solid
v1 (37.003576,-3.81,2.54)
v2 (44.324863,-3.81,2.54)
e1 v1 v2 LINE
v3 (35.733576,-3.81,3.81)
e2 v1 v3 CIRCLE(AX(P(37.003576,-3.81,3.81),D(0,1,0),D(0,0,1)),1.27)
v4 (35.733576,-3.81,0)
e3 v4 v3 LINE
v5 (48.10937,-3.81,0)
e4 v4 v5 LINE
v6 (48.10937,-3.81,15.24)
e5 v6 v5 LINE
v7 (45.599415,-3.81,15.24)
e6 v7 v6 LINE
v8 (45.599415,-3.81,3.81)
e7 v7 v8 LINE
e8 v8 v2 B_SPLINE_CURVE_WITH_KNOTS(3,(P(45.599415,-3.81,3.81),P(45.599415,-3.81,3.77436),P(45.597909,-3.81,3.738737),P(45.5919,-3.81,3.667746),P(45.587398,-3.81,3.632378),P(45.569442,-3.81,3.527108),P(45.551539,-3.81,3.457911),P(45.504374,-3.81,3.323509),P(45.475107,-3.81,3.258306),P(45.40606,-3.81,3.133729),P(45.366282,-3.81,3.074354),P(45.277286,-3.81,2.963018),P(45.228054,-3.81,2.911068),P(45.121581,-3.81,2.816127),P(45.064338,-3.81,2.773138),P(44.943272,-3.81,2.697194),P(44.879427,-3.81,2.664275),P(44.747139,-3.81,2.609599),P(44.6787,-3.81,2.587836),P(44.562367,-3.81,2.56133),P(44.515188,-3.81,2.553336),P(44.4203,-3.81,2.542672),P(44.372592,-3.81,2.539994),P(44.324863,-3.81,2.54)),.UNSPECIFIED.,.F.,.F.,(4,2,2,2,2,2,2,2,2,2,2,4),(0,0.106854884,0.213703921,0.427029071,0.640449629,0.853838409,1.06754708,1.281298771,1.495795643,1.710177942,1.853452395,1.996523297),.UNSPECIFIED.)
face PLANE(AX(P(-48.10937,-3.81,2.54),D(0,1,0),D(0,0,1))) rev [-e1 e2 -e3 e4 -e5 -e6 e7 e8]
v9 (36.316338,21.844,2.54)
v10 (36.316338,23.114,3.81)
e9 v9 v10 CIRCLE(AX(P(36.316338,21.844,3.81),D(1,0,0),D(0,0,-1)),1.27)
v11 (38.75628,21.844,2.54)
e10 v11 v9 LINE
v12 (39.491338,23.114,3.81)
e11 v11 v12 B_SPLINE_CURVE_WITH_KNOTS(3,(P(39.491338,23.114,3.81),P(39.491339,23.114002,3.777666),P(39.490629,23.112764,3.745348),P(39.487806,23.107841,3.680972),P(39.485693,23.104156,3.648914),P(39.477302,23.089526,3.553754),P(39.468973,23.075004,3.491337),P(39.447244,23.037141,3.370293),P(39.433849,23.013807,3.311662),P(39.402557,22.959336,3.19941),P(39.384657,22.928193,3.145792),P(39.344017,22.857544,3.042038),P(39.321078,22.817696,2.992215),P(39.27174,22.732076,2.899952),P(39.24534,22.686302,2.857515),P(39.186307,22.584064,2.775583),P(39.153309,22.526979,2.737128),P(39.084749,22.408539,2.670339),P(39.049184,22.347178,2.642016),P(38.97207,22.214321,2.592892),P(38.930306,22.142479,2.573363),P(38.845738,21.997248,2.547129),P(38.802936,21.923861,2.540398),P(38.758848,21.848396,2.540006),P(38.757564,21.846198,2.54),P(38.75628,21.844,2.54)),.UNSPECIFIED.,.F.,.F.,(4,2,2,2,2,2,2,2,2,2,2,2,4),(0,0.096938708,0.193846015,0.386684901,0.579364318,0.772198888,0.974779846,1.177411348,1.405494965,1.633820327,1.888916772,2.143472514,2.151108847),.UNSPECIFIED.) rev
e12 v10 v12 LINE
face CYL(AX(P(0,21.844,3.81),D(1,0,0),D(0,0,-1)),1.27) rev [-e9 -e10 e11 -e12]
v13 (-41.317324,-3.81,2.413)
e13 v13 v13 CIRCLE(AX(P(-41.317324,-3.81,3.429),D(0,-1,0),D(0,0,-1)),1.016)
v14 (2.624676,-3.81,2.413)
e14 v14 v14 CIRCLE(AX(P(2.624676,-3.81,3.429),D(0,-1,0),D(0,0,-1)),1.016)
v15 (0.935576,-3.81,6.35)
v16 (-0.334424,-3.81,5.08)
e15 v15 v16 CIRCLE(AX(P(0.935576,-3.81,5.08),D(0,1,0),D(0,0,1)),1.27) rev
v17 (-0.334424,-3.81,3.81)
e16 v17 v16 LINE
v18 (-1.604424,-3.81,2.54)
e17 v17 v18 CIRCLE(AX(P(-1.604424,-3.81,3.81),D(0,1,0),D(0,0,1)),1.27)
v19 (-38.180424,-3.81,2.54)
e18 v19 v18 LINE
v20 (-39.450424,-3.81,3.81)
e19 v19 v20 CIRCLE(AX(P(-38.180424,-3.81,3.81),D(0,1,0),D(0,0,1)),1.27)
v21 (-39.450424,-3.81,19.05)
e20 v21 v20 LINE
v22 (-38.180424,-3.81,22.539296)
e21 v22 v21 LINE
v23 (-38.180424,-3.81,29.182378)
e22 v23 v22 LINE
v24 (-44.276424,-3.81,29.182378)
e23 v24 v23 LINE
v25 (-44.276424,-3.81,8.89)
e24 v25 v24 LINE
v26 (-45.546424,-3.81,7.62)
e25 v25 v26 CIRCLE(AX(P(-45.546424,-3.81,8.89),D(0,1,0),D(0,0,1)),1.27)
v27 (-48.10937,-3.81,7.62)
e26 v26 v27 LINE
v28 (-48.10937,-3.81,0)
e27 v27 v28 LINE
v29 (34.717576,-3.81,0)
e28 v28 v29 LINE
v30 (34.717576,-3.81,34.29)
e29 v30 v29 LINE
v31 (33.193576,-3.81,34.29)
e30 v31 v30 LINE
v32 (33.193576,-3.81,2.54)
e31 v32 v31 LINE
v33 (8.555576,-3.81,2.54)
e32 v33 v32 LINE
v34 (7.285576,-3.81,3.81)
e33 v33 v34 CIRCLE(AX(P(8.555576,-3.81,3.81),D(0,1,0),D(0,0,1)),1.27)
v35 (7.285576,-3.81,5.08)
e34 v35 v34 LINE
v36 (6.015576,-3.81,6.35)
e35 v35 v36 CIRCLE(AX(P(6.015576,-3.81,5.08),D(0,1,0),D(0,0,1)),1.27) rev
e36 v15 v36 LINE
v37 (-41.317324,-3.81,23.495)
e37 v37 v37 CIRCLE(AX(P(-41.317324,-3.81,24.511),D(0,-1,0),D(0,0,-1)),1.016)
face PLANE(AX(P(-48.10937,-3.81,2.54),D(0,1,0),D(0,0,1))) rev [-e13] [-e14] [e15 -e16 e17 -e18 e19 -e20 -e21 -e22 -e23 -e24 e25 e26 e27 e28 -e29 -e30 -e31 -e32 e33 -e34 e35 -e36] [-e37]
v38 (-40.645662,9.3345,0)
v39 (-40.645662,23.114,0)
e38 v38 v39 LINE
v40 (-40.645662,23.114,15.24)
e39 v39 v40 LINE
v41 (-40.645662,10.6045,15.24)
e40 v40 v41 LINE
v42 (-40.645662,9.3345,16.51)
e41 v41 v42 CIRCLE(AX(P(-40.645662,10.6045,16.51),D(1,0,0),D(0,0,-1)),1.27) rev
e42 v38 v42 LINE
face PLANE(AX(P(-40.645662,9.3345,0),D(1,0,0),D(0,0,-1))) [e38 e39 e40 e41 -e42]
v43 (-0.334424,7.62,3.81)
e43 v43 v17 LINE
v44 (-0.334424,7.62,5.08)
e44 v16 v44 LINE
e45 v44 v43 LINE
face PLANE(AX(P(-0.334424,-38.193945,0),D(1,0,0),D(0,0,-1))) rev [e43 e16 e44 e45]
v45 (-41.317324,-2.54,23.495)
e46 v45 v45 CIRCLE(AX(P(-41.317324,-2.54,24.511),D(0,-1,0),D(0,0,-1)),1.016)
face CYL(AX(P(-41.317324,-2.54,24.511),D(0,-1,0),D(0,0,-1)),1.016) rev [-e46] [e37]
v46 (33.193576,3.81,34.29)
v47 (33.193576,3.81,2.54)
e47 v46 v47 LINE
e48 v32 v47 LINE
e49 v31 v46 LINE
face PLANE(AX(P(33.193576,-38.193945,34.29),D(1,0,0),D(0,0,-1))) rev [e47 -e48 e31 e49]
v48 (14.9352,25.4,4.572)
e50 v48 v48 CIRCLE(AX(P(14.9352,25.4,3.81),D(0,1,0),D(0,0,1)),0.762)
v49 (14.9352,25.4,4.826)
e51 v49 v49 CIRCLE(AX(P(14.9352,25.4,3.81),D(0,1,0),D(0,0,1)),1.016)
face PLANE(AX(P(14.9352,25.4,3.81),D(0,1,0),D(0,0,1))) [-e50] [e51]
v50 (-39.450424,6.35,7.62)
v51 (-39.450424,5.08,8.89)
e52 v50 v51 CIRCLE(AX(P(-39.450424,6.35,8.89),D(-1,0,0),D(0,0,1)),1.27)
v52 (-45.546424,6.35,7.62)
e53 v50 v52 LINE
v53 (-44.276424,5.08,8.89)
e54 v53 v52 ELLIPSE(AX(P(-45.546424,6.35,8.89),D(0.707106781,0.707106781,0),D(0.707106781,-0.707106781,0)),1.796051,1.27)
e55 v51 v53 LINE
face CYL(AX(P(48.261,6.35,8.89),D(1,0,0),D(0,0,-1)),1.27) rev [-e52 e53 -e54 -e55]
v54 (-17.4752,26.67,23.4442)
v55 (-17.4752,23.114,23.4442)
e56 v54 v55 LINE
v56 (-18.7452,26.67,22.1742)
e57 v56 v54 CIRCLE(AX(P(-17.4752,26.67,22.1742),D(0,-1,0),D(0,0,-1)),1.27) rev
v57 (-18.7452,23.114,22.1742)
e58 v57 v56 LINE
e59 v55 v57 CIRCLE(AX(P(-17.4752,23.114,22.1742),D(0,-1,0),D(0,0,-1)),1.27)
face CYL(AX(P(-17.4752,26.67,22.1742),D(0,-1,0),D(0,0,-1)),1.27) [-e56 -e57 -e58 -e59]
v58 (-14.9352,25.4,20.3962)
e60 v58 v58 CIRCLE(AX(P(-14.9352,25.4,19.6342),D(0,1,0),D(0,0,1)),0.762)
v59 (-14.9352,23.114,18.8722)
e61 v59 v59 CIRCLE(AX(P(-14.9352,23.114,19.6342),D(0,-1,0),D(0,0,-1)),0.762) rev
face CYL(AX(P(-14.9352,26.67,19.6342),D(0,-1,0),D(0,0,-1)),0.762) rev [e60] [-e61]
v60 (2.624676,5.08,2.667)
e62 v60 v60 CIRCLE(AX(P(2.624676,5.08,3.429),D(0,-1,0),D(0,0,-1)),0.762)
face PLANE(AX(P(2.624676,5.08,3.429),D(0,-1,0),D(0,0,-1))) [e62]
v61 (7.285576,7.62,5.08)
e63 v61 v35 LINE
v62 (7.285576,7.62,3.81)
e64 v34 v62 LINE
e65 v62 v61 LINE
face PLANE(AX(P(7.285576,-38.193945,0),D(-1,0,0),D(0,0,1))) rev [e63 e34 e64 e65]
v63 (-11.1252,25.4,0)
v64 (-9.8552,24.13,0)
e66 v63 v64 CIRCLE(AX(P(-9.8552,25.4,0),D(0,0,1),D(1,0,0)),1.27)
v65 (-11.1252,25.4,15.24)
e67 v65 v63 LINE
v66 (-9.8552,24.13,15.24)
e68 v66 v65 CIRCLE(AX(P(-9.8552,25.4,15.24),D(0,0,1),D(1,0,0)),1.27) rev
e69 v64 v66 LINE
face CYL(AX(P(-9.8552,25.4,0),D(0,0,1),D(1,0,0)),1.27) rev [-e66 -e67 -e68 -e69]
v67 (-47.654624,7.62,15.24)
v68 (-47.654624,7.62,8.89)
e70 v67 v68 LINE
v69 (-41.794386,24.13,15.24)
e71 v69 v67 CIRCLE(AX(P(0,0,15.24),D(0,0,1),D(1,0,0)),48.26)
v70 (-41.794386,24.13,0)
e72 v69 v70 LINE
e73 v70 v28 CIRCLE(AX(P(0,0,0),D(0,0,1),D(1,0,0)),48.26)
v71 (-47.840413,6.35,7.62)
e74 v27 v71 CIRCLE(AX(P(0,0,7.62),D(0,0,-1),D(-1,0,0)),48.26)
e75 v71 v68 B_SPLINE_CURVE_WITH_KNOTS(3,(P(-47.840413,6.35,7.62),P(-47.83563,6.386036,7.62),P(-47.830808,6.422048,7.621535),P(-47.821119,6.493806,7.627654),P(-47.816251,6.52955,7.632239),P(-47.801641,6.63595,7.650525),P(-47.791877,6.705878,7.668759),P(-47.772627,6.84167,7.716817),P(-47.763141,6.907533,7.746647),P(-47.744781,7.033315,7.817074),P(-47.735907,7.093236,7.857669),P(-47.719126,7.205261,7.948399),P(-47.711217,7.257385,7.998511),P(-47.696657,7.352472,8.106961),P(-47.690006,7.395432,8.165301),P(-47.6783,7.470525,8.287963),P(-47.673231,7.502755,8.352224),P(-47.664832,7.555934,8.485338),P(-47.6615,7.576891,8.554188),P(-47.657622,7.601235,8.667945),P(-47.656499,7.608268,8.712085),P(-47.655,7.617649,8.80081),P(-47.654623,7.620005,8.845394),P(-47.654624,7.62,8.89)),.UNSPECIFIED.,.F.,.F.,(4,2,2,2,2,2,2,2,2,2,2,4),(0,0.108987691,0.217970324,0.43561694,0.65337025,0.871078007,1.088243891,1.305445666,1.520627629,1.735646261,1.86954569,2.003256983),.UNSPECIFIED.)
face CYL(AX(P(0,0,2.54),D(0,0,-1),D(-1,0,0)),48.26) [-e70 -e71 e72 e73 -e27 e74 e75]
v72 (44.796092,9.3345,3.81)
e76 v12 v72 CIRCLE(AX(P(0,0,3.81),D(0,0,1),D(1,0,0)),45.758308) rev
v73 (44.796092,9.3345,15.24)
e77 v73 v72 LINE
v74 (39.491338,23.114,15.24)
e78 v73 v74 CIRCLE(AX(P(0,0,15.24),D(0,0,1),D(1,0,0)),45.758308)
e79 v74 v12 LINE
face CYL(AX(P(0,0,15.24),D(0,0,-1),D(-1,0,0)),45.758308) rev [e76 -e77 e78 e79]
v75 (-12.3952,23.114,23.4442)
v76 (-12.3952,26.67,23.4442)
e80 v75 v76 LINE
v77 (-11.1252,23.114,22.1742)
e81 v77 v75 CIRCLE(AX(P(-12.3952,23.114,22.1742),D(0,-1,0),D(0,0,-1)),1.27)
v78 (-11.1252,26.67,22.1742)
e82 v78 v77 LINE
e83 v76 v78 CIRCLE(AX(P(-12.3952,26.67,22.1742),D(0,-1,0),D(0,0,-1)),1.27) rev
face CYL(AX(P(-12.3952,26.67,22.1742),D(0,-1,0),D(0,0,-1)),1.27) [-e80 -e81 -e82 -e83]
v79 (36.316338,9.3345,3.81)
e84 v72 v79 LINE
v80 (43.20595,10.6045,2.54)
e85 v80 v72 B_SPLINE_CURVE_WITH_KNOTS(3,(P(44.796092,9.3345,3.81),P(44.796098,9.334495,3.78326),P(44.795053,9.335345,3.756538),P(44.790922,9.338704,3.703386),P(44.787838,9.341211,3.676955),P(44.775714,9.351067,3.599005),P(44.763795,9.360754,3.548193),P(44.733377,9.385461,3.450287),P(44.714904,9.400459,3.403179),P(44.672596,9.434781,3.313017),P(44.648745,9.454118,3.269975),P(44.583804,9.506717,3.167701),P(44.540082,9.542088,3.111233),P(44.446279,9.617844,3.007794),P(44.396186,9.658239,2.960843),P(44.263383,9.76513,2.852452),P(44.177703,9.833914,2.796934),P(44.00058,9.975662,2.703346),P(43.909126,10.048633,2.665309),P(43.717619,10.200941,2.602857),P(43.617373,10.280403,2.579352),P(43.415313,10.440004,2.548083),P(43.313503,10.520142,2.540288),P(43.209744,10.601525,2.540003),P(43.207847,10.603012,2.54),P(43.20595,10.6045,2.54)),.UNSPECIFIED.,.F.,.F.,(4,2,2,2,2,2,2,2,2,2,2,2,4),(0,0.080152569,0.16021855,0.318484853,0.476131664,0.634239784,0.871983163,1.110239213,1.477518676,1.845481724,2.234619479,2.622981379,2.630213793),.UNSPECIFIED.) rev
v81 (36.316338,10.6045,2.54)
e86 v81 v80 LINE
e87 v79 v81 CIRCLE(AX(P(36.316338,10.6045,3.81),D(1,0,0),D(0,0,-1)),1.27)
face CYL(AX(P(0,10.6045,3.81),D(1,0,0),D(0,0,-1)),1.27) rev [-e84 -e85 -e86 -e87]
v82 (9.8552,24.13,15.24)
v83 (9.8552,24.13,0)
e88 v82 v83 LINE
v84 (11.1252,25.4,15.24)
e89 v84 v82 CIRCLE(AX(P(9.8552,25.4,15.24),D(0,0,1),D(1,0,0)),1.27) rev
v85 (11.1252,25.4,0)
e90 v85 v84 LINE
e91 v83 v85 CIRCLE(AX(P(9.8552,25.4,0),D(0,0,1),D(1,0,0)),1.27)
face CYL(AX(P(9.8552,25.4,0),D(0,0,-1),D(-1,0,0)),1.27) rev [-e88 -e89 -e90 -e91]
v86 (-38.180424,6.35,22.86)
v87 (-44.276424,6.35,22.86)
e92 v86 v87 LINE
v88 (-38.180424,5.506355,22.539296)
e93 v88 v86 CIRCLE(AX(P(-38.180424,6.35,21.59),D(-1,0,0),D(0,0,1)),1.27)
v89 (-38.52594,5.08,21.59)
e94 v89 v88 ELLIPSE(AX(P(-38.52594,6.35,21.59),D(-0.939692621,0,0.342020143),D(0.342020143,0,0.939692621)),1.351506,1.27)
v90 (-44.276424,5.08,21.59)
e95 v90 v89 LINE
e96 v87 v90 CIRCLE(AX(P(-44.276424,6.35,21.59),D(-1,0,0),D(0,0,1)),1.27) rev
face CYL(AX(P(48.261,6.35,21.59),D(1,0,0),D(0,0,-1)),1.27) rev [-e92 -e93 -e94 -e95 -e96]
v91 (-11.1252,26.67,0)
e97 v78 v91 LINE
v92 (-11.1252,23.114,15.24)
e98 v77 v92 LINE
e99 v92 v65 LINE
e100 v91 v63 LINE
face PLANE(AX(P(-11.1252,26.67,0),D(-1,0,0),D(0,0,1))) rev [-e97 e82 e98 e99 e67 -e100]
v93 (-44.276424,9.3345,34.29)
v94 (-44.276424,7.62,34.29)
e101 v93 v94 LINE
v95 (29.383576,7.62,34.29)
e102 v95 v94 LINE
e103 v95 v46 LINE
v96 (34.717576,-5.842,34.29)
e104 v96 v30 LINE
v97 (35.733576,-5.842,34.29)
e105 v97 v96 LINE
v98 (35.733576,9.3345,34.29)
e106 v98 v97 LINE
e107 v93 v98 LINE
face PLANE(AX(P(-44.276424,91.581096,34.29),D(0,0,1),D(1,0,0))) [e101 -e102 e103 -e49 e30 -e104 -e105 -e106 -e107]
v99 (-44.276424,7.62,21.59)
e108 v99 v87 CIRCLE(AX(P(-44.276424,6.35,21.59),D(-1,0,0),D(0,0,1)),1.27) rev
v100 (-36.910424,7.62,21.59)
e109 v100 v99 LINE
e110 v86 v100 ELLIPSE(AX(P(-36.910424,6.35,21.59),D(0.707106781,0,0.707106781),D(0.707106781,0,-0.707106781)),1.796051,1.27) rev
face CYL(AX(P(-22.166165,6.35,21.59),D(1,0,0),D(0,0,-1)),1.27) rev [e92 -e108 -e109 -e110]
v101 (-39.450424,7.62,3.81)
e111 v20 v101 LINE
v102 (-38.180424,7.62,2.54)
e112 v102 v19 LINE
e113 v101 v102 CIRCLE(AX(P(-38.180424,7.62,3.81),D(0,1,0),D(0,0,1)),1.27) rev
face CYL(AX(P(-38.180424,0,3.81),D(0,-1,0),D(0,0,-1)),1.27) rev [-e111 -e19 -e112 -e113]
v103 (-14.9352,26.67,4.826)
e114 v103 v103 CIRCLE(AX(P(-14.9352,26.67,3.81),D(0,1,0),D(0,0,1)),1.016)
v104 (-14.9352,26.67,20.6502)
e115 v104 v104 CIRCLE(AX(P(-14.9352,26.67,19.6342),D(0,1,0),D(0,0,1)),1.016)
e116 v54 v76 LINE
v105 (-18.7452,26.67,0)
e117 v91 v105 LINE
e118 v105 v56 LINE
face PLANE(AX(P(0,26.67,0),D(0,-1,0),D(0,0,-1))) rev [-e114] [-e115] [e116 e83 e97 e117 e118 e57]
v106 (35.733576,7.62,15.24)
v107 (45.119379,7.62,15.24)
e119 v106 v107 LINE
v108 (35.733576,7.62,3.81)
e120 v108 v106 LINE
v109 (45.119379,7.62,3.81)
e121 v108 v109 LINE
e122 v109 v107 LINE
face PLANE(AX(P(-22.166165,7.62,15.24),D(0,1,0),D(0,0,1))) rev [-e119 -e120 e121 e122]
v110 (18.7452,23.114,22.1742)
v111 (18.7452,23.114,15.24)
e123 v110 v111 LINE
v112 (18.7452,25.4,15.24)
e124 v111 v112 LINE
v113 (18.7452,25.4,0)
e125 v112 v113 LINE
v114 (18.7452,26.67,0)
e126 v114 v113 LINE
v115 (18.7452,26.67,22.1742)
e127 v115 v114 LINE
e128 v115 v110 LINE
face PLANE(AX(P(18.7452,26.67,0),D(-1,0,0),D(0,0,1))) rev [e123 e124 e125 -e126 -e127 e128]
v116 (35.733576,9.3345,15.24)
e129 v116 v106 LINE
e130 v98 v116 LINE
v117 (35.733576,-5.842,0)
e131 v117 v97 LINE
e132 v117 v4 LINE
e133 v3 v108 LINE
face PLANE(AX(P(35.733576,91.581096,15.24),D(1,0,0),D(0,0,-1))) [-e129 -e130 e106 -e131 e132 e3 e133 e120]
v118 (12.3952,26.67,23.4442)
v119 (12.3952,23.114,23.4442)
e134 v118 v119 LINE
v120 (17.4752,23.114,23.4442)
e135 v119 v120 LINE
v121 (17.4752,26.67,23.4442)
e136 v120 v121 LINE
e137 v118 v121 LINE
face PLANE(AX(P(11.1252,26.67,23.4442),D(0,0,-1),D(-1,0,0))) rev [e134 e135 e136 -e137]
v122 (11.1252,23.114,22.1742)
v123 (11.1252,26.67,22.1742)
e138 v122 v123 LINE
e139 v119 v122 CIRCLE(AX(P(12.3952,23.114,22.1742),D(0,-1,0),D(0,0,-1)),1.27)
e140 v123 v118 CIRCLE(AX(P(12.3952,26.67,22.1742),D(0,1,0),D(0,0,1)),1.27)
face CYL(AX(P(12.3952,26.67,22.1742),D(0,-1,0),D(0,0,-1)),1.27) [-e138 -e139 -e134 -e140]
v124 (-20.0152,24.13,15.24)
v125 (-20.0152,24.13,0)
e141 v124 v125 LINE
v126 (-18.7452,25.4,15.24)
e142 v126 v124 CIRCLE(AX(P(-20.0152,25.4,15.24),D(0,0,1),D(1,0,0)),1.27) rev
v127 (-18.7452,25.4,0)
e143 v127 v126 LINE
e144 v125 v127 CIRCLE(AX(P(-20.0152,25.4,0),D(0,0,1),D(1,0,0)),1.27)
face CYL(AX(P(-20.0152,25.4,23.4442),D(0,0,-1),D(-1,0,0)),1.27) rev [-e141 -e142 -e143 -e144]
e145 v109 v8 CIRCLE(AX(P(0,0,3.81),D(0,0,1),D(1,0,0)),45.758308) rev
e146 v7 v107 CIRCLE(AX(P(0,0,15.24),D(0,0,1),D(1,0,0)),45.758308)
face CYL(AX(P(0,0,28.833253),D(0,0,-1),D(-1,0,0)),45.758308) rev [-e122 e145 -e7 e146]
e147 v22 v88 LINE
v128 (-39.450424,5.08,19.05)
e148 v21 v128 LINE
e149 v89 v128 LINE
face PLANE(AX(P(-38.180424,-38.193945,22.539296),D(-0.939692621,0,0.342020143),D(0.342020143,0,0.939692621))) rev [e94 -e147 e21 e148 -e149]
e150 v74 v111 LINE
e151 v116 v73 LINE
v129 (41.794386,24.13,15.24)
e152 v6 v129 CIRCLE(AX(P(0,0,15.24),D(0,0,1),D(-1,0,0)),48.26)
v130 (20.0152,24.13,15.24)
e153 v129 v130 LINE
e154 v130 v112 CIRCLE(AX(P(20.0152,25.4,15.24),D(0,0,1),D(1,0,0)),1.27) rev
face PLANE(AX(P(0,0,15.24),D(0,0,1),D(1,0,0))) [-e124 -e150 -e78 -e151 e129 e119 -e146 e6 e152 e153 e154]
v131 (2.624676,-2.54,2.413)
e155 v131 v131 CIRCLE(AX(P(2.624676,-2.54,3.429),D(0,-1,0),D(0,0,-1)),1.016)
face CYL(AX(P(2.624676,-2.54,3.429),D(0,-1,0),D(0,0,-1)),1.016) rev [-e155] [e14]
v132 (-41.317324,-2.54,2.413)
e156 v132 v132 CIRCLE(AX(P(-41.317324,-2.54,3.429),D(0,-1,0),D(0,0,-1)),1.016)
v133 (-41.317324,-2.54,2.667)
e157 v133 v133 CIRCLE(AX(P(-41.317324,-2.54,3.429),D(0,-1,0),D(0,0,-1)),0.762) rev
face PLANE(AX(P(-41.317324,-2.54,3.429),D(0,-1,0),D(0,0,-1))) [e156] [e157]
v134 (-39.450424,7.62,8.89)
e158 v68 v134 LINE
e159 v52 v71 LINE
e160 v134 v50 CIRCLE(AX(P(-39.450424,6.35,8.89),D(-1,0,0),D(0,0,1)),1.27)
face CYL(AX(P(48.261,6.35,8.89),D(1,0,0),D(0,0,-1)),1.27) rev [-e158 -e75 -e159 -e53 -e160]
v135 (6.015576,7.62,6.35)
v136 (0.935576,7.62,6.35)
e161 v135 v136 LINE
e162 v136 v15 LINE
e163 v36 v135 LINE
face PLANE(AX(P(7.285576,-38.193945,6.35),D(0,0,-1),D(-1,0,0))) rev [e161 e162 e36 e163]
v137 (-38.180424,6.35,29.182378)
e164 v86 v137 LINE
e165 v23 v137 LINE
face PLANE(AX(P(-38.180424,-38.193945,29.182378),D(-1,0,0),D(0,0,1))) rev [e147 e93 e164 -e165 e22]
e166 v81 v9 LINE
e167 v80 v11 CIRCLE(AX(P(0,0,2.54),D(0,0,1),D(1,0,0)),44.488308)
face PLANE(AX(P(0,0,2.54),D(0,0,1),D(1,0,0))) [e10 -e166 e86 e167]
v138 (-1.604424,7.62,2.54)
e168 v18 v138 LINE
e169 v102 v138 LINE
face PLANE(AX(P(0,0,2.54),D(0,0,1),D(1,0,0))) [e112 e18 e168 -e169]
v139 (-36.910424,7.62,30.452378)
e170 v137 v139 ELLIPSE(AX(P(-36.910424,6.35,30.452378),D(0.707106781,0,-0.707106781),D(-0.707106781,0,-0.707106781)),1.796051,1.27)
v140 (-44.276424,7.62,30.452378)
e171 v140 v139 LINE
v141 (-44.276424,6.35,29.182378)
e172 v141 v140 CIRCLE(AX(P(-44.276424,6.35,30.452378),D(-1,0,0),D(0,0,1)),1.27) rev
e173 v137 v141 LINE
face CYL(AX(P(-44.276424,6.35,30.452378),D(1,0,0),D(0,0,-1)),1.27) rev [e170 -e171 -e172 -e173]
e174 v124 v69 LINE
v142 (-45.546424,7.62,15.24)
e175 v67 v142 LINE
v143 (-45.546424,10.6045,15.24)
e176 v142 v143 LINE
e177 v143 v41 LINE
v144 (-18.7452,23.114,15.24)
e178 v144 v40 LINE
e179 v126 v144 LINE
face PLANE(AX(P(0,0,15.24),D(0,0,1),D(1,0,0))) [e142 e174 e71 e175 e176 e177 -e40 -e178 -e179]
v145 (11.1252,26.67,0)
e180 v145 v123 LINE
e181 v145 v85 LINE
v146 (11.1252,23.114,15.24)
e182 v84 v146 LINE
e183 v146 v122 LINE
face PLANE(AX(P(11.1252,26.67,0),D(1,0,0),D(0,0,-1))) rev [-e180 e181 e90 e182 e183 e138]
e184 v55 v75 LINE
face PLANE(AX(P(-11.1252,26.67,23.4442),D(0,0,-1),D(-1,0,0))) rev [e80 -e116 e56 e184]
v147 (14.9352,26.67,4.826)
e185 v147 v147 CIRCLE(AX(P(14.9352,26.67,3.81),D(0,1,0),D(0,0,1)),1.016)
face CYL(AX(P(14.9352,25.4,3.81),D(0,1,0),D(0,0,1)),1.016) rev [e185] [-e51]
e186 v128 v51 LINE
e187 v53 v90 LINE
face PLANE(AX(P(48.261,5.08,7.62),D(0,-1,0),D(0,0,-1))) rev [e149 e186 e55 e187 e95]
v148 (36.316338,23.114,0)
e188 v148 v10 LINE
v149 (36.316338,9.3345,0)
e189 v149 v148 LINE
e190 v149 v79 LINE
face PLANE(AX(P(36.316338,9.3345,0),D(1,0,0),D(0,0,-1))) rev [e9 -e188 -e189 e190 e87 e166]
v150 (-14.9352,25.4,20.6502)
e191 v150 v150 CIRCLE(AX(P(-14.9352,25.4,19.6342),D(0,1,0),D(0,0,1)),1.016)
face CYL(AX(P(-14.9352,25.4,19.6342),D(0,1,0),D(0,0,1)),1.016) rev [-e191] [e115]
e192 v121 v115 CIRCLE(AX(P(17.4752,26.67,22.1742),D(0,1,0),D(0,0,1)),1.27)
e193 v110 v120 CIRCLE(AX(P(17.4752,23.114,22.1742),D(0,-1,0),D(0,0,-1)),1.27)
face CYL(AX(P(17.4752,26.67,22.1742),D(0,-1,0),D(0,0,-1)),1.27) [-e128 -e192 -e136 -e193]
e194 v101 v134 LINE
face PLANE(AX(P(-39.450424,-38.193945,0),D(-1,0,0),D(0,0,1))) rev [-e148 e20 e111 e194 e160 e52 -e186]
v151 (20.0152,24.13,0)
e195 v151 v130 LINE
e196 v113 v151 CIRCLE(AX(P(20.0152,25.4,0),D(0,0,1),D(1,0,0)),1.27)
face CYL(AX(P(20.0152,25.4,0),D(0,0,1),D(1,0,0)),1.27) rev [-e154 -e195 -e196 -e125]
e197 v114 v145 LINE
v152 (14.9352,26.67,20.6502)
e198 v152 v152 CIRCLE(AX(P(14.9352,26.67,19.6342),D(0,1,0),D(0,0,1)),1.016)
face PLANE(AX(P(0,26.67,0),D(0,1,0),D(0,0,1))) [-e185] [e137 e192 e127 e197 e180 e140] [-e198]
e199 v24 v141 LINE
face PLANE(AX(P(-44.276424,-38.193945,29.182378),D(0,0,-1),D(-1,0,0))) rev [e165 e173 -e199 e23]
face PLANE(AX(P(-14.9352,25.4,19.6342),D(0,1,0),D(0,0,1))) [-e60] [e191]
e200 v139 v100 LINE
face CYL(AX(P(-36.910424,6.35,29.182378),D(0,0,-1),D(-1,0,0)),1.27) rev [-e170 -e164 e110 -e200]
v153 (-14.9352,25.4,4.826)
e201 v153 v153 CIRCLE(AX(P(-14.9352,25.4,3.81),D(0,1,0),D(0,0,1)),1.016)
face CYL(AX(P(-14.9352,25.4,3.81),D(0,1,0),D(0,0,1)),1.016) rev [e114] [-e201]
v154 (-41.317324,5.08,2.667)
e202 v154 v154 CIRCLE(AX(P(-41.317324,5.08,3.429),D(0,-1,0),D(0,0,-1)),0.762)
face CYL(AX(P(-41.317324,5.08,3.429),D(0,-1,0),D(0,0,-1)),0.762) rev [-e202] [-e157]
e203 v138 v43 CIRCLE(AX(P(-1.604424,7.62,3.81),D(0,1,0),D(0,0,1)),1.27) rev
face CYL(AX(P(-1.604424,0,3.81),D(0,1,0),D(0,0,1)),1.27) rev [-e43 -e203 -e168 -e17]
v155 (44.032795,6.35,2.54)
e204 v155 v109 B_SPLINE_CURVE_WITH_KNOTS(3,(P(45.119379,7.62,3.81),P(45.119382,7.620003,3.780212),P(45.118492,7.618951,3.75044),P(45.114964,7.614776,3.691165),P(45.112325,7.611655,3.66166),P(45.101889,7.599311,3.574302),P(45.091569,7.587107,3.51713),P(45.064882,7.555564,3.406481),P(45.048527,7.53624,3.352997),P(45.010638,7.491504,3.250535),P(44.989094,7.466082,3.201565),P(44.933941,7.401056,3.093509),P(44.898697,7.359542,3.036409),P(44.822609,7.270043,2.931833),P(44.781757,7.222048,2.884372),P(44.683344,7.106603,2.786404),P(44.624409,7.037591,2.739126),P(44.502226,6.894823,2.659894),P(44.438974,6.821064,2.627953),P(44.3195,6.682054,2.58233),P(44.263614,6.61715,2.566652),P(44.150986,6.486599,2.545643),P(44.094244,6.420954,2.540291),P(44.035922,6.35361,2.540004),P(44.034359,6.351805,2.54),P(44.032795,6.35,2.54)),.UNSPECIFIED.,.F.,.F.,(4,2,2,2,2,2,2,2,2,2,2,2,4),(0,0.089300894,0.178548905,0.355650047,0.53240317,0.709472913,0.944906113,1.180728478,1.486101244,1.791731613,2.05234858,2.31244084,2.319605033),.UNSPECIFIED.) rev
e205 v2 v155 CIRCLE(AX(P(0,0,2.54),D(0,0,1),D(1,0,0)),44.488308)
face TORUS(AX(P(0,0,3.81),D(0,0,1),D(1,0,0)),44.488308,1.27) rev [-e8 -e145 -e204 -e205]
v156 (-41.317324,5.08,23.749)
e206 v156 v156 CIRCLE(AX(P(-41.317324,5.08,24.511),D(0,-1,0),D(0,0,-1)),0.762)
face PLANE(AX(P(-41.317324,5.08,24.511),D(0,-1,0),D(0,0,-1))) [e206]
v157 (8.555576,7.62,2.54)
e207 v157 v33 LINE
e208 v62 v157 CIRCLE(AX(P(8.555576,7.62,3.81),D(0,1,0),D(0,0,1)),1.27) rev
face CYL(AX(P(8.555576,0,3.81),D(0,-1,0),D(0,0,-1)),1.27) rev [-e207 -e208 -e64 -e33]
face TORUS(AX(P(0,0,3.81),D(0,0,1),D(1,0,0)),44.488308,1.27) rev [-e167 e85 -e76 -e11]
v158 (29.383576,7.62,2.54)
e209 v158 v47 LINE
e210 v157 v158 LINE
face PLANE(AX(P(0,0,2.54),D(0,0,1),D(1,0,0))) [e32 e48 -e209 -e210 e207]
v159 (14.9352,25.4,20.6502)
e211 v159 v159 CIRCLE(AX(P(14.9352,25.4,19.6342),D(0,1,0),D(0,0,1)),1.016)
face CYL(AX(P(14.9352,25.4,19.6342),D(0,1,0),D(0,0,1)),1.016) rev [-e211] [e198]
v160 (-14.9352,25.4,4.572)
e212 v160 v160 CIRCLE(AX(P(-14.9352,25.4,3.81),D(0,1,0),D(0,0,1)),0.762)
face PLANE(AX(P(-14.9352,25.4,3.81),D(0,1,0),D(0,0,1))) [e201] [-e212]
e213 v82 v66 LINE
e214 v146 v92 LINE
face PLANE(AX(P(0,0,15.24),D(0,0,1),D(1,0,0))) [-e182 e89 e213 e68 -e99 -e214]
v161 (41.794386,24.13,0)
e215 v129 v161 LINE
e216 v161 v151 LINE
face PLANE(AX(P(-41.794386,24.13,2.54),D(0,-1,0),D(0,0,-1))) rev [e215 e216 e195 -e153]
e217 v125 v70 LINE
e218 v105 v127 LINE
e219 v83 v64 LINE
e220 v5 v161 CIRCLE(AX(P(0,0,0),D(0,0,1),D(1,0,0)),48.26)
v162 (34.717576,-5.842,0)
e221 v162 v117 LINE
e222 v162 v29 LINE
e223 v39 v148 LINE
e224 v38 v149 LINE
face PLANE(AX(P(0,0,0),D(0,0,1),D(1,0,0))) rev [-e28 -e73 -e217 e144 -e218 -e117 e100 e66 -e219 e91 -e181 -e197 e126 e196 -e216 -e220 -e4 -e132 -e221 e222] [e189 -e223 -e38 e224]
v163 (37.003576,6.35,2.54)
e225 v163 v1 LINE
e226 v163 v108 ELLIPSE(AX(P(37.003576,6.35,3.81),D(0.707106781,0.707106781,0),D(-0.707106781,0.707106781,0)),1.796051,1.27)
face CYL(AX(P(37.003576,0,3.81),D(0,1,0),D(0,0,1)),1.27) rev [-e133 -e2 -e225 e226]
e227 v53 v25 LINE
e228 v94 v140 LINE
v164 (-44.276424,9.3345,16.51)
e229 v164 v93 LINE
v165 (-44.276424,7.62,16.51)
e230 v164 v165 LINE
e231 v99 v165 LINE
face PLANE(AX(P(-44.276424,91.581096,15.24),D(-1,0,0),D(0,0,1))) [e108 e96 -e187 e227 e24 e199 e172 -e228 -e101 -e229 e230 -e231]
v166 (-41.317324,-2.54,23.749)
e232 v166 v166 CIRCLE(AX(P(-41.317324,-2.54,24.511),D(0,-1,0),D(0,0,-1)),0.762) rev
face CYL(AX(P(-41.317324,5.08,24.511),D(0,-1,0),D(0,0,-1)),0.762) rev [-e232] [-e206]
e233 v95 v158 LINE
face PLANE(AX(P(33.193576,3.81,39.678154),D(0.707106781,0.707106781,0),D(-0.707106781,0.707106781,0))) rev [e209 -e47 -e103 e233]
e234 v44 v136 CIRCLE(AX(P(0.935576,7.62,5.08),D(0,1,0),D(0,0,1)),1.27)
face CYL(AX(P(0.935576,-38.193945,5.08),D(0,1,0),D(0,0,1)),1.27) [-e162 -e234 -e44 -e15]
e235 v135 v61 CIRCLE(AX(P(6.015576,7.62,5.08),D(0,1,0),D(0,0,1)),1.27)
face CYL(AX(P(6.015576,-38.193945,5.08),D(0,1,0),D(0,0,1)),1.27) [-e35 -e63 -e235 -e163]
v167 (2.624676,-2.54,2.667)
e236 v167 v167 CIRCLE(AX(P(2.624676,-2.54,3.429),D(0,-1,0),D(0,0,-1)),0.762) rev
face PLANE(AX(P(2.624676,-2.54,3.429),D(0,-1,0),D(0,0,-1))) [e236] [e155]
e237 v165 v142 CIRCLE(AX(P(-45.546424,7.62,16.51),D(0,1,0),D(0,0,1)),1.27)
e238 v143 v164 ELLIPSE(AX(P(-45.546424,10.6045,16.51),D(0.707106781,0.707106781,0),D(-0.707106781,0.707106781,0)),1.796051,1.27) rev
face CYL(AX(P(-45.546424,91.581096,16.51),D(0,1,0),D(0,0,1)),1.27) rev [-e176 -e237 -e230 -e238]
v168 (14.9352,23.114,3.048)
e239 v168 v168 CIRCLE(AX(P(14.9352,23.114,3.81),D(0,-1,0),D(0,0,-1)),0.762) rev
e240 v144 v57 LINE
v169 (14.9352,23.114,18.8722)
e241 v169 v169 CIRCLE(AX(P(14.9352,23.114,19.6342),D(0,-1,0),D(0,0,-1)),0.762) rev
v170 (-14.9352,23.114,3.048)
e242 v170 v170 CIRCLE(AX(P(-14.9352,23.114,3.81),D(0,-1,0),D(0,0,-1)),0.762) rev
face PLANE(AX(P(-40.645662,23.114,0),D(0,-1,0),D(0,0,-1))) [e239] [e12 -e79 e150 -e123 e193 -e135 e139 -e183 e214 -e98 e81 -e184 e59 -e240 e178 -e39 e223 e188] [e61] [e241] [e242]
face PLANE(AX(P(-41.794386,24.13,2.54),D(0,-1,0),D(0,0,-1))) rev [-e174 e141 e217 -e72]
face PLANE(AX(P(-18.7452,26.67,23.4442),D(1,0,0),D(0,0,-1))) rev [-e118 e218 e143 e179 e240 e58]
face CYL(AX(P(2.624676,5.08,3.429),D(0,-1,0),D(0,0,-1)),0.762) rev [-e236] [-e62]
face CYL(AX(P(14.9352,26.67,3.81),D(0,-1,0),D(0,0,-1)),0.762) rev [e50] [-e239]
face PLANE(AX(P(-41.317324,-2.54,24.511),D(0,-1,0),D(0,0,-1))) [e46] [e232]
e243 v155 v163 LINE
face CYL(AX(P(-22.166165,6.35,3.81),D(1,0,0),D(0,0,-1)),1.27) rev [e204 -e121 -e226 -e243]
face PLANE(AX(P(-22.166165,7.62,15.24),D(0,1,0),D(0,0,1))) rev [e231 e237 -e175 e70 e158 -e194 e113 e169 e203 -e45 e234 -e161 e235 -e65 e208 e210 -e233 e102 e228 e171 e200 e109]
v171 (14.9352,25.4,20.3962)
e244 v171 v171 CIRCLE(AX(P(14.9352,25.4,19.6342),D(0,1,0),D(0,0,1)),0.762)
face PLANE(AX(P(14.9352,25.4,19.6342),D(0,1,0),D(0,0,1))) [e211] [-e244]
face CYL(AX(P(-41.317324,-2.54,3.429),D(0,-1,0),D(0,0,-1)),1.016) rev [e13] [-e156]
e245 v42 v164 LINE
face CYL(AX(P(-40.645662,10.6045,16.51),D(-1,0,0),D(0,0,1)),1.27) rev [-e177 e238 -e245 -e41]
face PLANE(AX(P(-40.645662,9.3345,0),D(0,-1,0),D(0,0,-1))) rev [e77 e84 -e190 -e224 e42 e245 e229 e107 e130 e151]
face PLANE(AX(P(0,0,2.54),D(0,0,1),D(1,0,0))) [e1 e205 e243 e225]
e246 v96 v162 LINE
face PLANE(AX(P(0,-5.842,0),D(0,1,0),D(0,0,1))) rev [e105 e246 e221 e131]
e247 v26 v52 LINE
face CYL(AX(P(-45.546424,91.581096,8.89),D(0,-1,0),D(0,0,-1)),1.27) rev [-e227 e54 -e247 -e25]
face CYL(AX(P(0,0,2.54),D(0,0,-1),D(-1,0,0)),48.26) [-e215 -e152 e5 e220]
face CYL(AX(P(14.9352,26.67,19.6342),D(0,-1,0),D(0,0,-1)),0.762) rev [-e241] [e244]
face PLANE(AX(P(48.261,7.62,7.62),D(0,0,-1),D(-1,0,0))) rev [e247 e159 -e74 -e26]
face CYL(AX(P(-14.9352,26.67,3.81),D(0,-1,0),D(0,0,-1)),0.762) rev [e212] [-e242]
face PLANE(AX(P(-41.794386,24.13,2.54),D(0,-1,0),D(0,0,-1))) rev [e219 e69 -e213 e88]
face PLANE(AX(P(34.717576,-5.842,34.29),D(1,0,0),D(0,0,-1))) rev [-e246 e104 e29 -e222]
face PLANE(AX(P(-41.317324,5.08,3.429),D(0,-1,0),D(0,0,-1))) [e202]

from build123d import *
from build123d.topology import SkipClean

# Parameters (mm, degrees)
BOSS_EXTRUDE1_DEPTH  = 2.54
SKETCH3_W            = 76.962
SKETCH3_H            = 13.7795
CUT_EXTRUDE1_DEPTH   = 55.016072608
BOSS_EXTRUDE2_DEPTH  = 12.7
SKETCH6_W            = 80.01
SKETCH6_H            = 19.05
BOSS_EXTRUDE3_DEPTH  = 1.7145
SKETCH8_W            = 7.62
SKETCH8_H            = 6.35
SKETCH8_W_2          = 2.54
SKETCH8_H_2          = 34.29
BOSS_EXTRUDE4_DEPTH  = 11.43
SKETCH10_W           = 1.016
SKETCH10_H           = 34.29
BOSS_EXTRUDE5_DEPTH  = 2.032
SKETCH13_R           = 0.762
SKETCH13_W           = 7.62
SKETCH13_H           = 23.4442
BOSS_EXTRUDE6_DEPTH  = 2.54
BOSS_EXTRUDE7_START  = -1.016
SKETCH13_2_R         = 0.762
SKETCH13_2_W         = 7.62
SKETCH13_2_H         = 23.4442
BOSS_EXTRUDE7_DEPTH  = 1.016
CUT_EXTRUDE2_REACH   = 68.356
SKETCH13_3_R         = 0.762
SKETCH16_R           = 0.762
CUT_EXTRUDE3_DEPTH   = 8.89
SKETCH17_R           = 1.016
CUT_EXTRUDE4_DEPTH   = 1.27
SKETCH18_R           = 1.016
CUT_EXTRUDE5_DEPTH   = 1.27
BOSS_EXTRUDE8_DEPTH  = 31.75
CUT_EXTRUDE6_REACH   = 104.226
SKETCH20_W           = 15.24
SKETCH20_H           = 2.54
BOSS_EXTRUDE9_DEPTH  = 5.08
BOSS_EXTRUDE10_DEPTH = 12.7
FILLET2_R            = 1.27


with BuildPart() as part:
    # Sketch2 → Boss-Extrude1 (new body)
    with BuildSketch(Plane.XY):
        with BuildLine():
            Line((-41.794385987, 24.13), (41.794385987, 24.13))
            ThreePointArc((41.794385987, 24.13), (47.072627329, 10.639330635), (48.109370189, -3.81))
            Line((48.109370189, -3.81), (-48.109370189, -3.81))
            ThreePointArc((-48.109370189, -3.81), (-47.072627329, 10.639330635), (-41.794385987, 24.13))
        make_face()
    extrude(amount=BOSS_EXTRUDE1_DEPTH)

    # Sketch3 → Cut-Extrude1 (cut, through all)
    with BuildSketch(Plane.XY.offset(2.54)):
        with Locations((-2.164662018, 16.22425)):
            Rectangle(SKETCH3_W, SKETCH3_H)
    extrude(amount=-CUT_EXTRUDE1_DEPTH, mode=Mode.SUBTRACT)

    # Sketch4 → Boss-Extrude2 (add)
    with BuildSketch(Plane.XY.offset(2.54)):
        with BuildLine():
            Line((-22.166164877, 7.62), (47.65462412, 7.62))
            ThreePointArc((47.65462412, 7.62), (45.479955775, 16.143147857), (41.794385987, 24.13))
            Line((41.794385987, 24.13), (-41.794385987, 24.13))
            ThreePointArc((-41.794385987, 24.13), (-45.479955775, 16.143147857), (-47.65462412, 7.62))
            Line((-47.65462412, 7.62), (-22.166164877, 7.62))
        make_face()
        with BuildLine():
            Line((-40.645662018, 23.114), (36.316337982, 23.114))
            Line((36.316337982, 23.114), (39.491337982, 23.114))
            ThreePointArc((39.491337982, 23.114), (42.703177622, 16.439628723), (44.796092255, 9.3345))
            Line((44.796092255, 9.3345), (36.316337982, 9.3345))
            Line((36.316337982, 9.3345), (-40.645662018, 9.3345))
            Line((-40.645662018, 9.3345), (-40.645662018, 23.114))
        make_face(mode=Mode.SUBTRACT)
    extrude(amount=BOSS_EXTRUDE2_DEPTH)

    # Sketch6 → Boss-Extrude3 (add)
    with BuildSketch(Plane.XZ.offset(-7.62)):
        with Locations((-4.27142412, 24.765)):
            Rectangle(SKETCH6_W, SKETCH6_H)
    extrude(amount=-BOSS_EXTRUDE3_DEPTH)

    # Sketch8 → Boss-Extrude4 (add)
    with BuildSketch(Plane.XZ.offset(-7.62)):
        Polygon((-39.45042412, 0), (-39.45042412, 19.05), (-38.18042412, 22.539296323), (-38.18042412, 29.182378244), (-44.27642412, 29.182378244), (-44.27642412, 0), align=None)
        with Locations((3.47557588, 3.175)):
            Rectangle(SKETCH8_W, SKETCH8_H)
        with Locations((34.46357588, 17.145)):
            Rectangle(SKETCH8_W_2, SKETCH8_H_2)
    extrude(amount=BOSS_EXTRUDE4_DEPTH)

    # Sketch10 → Boss-Extrude5 (add)
    with BuildSketch(Plane.XZ.offset(3.81)):
        with Locations((35.22557588, 17.145)):
            Rectangle(SKETCH10_W, SKETCH10_H)
    extrude(amount=BOSS_EXTRUDE5_DEPTH)

    # Sketch13 → Boss-Extrude6 (add)
    # profile 1 of 2: a face of its own
    with BuildSketch(Plane(origin=(0, 24.13, 0), x_dir=(1, 0, 0), z_dir=(0, 1, 0))):
        Polygon((-18.7452, 0), (-11.1252, 0), (-11.1252, -7.62), (-11.1252, -23.4442), (-18.7452, -23.4442), (-18.7452, -7.62), align=None)
        with Locations(Location((-14.9352, -3.81, 0), (0, 0, 270))):
            Circle(SKETCH13_R, mode=Mode.SUBTRACT)
        with Locations(Location((-14.9352, -19.6342, 0), (0, 0, 270))):
            Circle(SKETCH13_R, mode=Mode.SUBTRACT)
    # profile 2 of 2: a face of its own
    with BuildSketch(Plane(origin=(0, 24.13, 0), x_dir=(1, 0, 0), z_dir=(0, 1, 0))):
        with Locations((14.9352, -11.7221)):
            Rectangle(SKETCH13_W, SKETCH13_H)
        with Locations(Location((14.9352, -19.6342, 0), (0, 0, 270))):
            Circle(SKETCH13_R, mode=Mode.SUBTRACT)
        with Locations(Location((14.9352, -3.81, 0), (0, 0, 270))):
            Circle(SKETCH13_R, mode=Mode.SUBTRACT)
    extrude(amount=BOSS_EXTRUDE6_DEPTH)

    # Sketch13<2> → Boss-Extrude7 (add)
    # profile 1 of 2: a face of its own
    with BuildSketch(Plane(origin=(0, 24.13, 0), x_dir=(1, 0, 0), z_dir=(0, 1, 0)).offset(BOSS_EXTRUDE7_START)):
        Polygon((-18.7452, 0), (-11.1252, 0), (-11.1252, -7.62), (-11.1252, -23.4442), (-18.7452, -23.4442), (-18.7452, -7.62), align=None)
        with Locations(Location((-14.9352, -3.81, 0), (0, 0, 270))):
            Circle(SKETCH13_2_R, mode=Mode.SUBTRACT)
        with Locations(Location((-14.9352, -19.6342, 0), (0, 0, 90))):
            Circle(SKETCH13_2_R, mode=Mode.SUBTRACT)
    # profile 2 of 2: a face of its own
    with BuildSketch(Plane(origin=(0, 24.13, 0), x_dir=(1, 0, 0), z_dir=(0, 1, 0)).offset(BOSS_EXTRUDE7_START)):
        with Locations((14.9352, -11.7221)):
            Rectangle(SKETCH13_2_W, SKETCH13_2_H)
        with Locations(Location((14.9352, -19.6342, 0), (0, 0, 90))):
            Circle(SKETCH13_2_R, mode=Mode.SUBTRACT)
        with Locations(Location((14.9352, -3.81, 0), (0, 0, 270))):
            Circle(SKETCH13_2_R, mode=Mode.SUBTRACT)
    extrude(amount=BOSS_EXTRUDE7_DEPTH)

    # Sketch13<3> → Cut-Extrude2 (cut, up to next)
    with BuildSketch(Plane(origin=(0, 24.13, 0), x_dir=(1, 0, 0), z_dir=(0, 1, 0)), mode=Mode.PRIVATE) as cut_extrude2_sk1:
        with Locations(Location((-14.9352, -3.81, 0), (0, 0, 90))):
            Circle(SKETCH13_3_R)
    cut_extrude2_tool1 = extrude(cut_extrude2_sk1.sketch, amount=-CUT_EXTRUDE2_REACH, mode=Mode.PRIVATE) & part.part
    # Sketch13<3> → Cut-Extrude2 (cut, up to next)
    with BuildSketch(Plane(origin=(0, 24.13, 0), x_dir=(1, 0, 0), z_dir=(0, 1, 0)), mode=Mode.PRIVATE) as cut_extrude2_sk2:
        with Locations(Location((14.9352, -3.81, 0), (0, 0, 90))):
            Circle(SKETCH13_3_R)
    cut_extrude2_tool2 = extrude(cut_extrude2_sk2.sketch, amount=-CUT_EXTRUDE2_REACH, mode=Mode.PRIVATE) & part.part
    add(cut_extrude2_tool1.solids().sort_by_distance((-14.9352, 24.13, 3.81))[0], mode=Mode.SUBTRACT)
    add(cut_extrude2_tool2.solids().sort_by_distance((14.9352, 24.13, 3.81))[0], mode=Mode.SUBTRACT)

    # Sketch16 → Cut-Extrude3 (cut)
    with SkipClean():  # the faces are left unmerged after this step: merging them gives an invalid solid
        with BuildSketch(Plane.XZ.offset(3.81)):
            with Locations(Location((-41.31732412, 24.511, 0), (0, 0, 270))):
                Circle(SKETCH16_R)
            with Locations(Location((-41.31732412, 3.429, 0), (0, 0, 270))):
                Circle(SKETCH16_R)
            with Locations(Location((2.62467588, 3.429, 0), (0, 0, 270))):
                Circle(SKETCH16_R)
        extrude(amount=-CUT_EXTRUDE3_DEPTH, mode=Mode.SUBTRACT)

    # Sketch17 → Cut-Extrude4 (cut)
    with SkipClean():  # the faces are left unmerged after this step: merging them gives an invalid solid
        with BuildSketch(Plane.XZ.offset(3.81)):
            with Locations(Location((-41.31732412, 24.511, 0), (0, 0, 270))):
                Circle(SKETCH17_R)
            with Locations(Location((-41.31732412, 3.429, 0), (0, 0, 270))):
                Circle(SKETCH17_R)
            with Locations(Location((2.62467588, 3.429, 0), (0, 0, 270))):
                Circle(SKETCH17_R)
        extrude(amount=-CUT_EXTRUDE4_DEPTH, mode=Mode.SUBTRACT)

    # Sketch18 → Cut-Extrude5 (cut)
    with BuildSketch(Plane(origin=(0, 26.67, 0), x_dir=(1, 0, 0), z_dir=(0, 1, 0))):
        with Locations(Location((-14.9352, -3.81, 0), (0, 0, 270))):
            Circle(SKETCH18_R)
        with Locations(Location((14.9352, -19.6342, 0), (0, 0, 270))):
            Circle(SKETCH18_R)
        with Locations(Location((-14.9352, -19.6342, 0), (0, 0, 270))):
            Circle(SKETCH18_R)
        with Locations(Location((14.9352, -3.81, 0), (0, 0, 270))):
            Circle(SKETCH18_R)
    extrude(amount=-CUT_EXTRUDE5_DEPTH, mode=Mode.SUBTRACT)

    # Sketch19 → Boss-Extrude8 (add)
    with BuildSketch(Plane.XY.offset(2.54)):
        Polygon((33.19357588, 7.62), (33.19357588, 3.81), (29.38357588, 7.62), align=None)
    extrude(amount=BOSS_EXTRUDE8_DEPTH)

    # Sketch20 → Cut-Extrude6 (cut, up to next)
    with BuildSketch(Plane.ZY.offset(44.27642412), mode=Mode.PRIVATE) as cut_extrude6_sk1:
        with Locations((15.24, 6.35)):
            Rectangle(SKETCH20_W, SKETCH20_H)
    cut_extrude6_tool1 = extrude(cut_extrude6_sk1.sketch, amount=-CUT_EXTRUDE6_REACH, mode=Mode.PRIVATE) & part.part
    add(cut_extrude6_tool1.solids().sort_by_distance((-44.276424, 6.35, 15.24))[0], mode=Mode.SUBTRACT)

    # Sketch21 → Boss-Extrude9 (add)
    with BuildSketch(Plane.XY.offset(2.54)):
        with BuildLine():
            Line((-48.109370189, -3.81), (-44.27642412, -3.81))
            Line((-44.27642412, -3.81), (-44.27642412, 7.62))
            Line((-44.27642412, 7.62), (-47.65462412, 7.62))
            ThreePointArc((-47.65462412, 7.62), (-48.221850613, 1.918521174), (-48.109370189, -3.81))
        make_face()
    extrude(amount=BOSS_EXTRUDE9_DEPTH)

    # Sketch21<3> → Boss-Extrude10 (add)
    with BuildSketch(Plane.XY.offset(2.54)):
        with BuildLine():
            Line((44.796092255, 9.3345), (47.65462412, 7.62))
            ThreePointArc((47.65462412, 7.62), (48.221850613, 1.918521174), (48.109370189, -3.81))
            Line((48.109370189, -3.81), (45.599415255, -3.81))
            ThreePointArc((45.599415255, -3.81), (45.673092895, 2.791300239), (44.796092255, 9.3345))
        make_face()
    extrude(amount=BOSS_EXTRUDE10_DEPTH)

    # Fillet2
    fillet2_edges = [part.edges().sort_by_distance(p)[0] for p in [
        (18.7452, 24.13, 7.62),
        (11.1252, 24.13, 7.62),
        (-11.1252, 24.13, 7.62),
        (-18.7452, 24.13, 7.62),
        (-18.7452, 24.892, 23.4442),
        (-11.1252, 24.892, 23.4442),
        (18.7452, 24.892, 23.4442),
        (11.1252, 24.892, 23.4442),
        (37.903837982, 23.114, 2.54),
        (42.703177622, 16.439628723, 2.54),
        (40.556215118, 9.3345, 2.54),
        (35.73357588, 1.905, 2.54),
        (40.426477497, 7.62, 2.54),
        (45.718006714, 1.920060852, 2.54),
        (7.28557588, 1.905, 2.54),
        (7.28557588, 1.905, 6.35),
        (-0.33442412, 1.905, 6.35),
        (-0.33442412, 1.905, 2.54),
        (-41.22842412, 7.62, 29.182378244),
        (-38.18042412, 7.62, 26.021189122),
        (-39.45042412, 1.905, 2.54),
        (-44.27642412, 0.635, 7.62),
        (-42.461043069, 9.3345, 15.24),
        (-44.27642412, 8.47725, 15.24),
        (-41.22842412, 5.08, 22.86),
        (-41.22842412, 7.62, 22.86),
        (-41.86342412, 5.08, 7.62),
        (-43.55252412, 7.62, 7.62),
    ]]
    fillet(fillet2_edges, radius=FILLET2_R - 0.0001)  # a hair under: the kernel refuses the full size


solid = part.part
